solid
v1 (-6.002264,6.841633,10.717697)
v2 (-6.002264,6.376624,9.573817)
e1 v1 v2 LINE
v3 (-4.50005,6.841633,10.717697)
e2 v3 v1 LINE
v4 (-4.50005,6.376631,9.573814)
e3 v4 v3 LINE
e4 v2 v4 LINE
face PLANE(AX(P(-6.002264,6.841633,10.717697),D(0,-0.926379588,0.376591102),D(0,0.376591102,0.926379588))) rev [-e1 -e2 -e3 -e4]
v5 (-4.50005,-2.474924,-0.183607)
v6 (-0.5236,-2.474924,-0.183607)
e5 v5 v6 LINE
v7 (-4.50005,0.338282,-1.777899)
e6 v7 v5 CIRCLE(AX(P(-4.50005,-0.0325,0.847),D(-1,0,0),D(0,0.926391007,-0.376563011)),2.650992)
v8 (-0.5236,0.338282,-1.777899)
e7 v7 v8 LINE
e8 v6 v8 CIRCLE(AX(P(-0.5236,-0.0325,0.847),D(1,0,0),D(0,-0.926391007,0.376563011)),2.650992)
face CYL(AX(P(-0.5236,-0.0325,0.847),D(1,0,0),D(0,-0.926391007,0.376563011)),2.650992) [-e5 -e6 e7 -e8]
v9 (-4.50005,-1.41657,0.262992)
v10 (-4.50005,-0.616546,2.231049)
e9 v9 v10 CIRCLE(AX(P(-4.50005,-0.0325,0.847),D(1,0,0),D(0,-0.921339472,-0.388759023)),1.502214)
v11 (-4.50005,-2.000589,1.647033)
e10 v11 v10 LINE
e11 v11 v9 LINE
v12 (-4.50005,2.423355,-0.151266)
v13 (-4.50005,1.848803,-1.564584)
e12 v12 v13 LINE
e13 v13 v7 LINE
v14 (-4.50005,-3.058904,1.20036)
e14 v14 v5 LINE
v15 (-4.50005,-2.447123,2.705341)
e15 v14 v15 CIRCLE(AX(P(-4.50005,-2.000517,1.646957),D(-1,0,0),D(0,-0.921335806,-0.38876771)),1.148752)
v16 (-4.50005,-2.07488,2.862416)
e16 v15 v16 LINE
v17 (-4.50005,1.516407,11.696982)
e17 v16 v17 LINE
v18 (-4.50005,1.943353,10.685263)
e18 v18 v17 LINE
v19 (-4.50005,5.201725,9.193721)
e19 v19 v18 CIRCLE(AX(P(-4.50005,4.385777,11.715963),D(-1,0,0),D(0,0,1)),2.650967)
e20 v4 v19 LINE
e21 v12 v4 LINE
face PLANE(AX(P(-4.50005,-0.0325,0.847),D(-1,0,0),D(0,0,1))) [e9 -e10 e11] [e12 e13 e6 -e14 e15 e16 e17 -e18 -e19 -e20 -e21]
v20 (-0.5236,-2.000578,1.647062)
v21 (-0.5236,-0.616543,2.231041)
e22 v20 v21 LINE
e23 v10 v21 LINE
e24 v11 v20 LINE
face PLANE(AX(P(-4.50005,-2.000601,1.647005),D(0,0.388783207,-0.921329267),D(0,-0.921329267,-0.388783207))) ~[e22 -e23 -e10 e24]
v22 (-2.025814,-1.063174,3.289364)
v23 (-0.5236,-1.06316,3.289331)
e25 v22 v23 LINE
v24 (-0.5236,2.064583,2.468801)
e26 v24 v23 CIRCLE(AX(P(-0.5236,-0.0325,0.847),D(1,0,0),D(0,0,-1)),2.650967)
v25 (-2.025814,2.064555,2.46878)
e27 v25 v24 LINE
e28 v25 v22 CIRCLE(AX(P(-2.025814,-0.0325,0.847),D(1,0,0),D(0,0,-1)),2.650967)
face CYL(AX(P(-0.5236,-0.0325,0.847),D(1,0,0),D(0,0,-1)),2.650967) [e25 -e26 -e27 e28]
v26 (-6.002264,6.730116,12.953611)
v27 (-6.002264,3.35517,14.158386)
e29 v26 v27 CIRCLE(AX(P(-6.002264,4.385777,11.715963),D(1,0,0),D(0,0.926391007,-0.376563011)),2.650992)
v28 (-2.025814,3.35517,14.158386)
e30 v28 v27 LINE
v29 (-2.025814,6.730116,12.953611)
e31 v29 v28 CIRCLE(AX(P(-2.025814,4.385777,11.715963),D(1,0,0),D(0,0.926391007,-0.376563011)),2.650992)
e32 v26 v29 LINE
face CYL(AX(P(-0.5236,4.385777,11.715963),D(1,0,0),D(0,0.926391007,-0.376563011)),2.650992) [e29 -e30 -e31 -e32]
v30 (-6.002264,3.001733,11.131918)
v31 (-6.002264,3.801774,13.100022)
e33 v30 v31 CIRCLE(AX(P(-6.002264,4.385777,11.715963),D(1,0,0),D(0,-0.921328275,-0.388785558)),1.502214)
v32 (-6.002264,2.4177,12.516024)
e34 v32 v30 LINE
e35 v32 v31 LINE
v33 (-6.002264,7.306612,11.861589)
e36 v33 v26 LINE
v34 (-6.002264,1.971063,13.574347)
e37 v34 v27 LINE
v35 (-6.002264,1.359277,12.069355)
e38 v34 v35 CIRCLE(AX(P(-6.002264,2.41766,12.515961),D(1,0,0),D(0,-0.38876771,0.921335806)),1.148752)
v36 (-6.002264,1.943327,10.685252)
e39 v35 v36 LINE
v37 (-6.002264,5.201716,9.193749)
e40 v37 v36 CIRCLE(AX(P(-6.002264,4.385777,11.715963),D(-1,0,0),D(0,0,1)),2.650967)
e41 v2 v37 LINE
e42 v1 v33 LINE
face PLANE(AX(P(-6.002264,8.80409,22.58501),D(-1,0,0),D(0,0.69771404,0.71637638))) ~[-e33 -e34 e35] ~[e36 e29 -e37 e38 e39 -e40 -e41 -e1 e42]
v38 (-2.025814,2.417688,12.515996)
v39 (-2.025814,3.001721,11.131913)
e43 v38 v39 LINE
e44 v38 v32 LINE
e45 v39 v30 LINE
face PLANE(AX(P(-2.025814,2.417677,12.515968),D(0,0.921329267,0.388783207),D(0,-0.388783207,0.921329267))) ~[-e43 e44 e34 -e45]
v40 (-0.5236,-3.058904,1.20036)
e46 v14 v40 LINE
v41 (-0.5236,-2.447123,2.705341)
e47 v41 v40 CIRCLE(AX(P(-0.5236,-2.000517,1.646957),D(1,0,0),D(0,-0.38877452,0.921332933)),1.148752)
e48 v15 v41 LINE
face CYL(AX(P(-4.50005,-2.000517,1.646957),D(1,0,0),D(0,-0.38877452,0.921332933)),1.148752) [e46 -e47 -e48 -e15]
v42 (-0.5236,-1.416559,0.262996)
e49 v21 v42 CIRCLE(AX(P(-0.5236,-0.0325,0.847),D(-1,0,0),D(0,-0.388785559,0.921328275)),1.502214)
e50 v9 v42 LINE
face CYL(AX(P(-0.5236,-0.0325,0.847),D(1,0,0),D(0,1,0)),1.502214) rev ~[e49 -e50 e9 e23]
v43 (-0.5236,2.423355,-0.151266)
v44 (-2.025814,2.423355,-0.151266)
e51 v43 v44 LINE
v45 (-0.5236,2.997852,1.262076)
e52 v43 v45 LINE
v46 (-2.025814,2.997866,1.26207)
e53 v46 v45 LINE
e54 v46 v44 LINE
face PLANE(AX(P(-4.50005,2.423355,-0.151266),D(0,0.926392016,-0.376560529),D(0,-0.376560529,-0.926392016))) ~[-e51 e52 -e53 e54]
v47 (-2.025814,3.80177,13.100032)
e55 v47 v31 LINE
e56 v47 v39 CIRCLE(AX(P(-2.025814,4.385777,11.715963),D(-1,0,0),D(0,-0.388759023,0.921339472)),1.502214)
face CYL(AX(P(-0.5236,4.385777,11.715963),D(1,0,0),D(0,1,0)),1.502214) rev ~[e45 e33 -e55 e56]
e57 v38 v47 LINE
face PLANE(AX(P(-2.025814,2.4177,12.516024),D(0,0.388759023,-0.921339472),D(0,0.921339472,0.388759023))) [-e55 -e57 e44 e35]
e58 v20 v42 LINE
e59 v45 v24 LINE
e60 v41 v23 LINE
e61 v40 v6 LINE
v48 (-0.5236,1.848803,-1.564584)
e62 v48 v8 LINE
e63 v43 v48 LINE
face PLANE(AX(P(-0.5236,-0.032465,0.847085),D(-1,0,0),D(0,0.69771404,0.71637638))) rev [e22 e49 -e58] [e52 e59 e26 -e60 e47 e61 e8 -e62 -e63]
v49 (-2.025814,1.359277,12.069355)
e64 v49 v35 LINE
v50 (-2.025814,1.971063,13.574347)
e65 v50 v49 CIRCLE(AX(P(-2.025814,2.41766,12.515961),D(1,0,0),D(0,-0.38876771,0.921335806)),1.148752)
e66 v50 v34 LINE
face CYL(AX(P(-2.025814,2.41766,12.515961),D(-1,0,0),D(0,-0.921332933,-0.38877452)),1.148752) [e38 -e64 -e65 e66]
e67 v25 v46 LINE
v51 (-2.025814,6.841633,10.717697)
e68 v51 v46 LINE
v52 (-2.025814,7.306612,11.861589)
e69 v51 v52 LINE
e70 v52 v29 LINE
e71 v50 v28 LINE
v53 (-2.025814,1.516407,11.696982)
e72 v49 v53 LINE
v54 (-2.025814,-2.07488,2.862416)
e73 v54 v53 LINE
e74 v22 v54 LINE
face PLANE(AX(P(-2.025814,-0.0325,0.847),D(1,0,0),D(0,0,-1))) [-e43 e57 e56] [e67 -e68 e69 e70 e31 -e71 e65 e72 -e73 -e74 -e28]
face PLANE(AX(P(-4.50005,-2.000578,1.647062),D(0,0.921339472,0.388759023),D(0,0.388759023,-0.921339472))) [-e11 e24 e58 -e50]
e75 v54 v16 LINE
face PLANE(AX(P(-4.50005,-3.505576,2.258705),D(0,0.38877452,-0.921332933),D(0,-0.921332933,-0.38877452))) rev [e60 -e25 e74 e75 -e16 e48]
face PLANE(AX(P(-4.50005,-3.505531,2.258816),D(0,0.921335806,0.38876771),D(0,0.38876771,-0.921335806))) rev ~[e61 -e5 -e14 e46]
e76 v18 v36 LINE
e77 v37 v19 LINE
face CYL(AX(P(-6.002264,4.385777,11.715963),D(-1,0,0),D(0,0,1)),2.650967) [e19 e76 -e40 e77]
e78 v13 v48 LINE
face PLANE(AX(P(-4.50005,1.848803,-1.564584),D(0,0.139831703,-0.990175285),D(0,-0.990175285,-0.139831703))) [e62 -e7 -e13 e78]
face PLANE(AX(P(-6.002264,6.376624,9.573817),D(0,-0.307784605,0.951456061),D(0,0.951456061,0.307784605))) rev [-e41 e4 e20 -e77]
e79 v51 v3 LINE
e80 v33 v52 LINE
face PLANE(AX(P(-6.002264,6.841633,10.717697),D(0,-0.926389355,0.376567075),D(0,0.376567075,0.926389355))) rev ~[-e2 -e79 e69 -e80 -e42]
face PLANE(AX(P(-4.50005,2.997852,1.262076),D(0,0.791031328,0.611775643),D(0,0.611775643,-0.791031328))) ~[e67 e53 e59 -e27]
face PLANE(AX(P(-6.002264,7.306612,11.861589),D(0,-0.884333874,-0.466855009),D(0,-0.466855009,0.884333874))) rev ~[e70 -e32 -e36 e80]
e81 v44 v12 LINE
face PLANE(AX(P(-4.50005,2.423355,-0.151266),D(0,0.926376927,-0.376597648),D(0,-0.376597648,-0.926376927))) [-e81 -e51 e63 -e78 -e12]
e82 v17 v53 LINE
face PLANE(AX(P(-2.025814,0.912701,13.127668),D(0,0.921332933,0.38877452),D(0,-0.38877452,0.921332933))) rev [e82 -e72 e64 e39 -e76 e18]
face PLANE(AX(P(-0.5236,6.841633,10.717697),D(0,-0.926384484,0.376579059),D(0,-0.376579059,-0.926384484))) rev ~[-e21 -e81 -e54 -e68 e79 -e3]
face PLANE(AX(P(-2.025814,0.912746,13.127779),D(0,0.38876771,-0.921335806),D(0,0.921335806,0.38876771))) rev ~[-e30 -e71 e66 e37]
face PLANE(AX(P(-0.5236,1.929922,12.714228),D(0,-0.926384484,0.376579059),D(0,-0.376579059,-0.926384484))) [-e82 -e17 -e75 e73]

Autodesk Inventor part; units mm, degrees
ref_plane "YZ Plane" through (0, 0, 0) normal (1, 0, 0) x (0, 1, 0)
ref_plane "XY Plane" through (0, 0, 0) normal (0, 0, 1) x (1, 0, 0)
sketch "スケッチ1" plane through (0, 0, 0) normal (1, 0, 0) x (0, 1, 0)
  arc A0 (-2.7792, 1.1297) -> (2.7792, -1.1297) centre (0, 0) ccw
  circle A1 centre (5, 12.3) radius 1.7
  arc A2 (7.7792, 11.1703) -> (2.2208, 13.4297) centre (5, 12.3) ccw
  circle A3 centre (0, 0) radius 1.7
  line L0 (2.2208, 13.4297) -> (-2.7792, 1.1297)
  line L1 (7.7792, 11.1703) -> (2.7792, -1.1297)
  dimension "d1" = 3.4
  dimension "d2" = 6
  dimension "d3" = 3.4
  dimension "d4" = 5
  dimension "d5" = 12.3
  dimension "d8" = 3
extrude "押し出し1" add sketch "スケッチ1" against normal blind 6.2
sketch "スケッチ2" plane through (0, 0, 0) normal (1, 0, 0) x (0, 0, -1)
  circle A0 centre (0, 0) radius 1.7 projected
  circle A1 centre (-12.3, 5) radius 1.7 projected
  line L0 (-1.1297, -2.7792) -> (-13.4297, 2.2208) projected
  arc A2 (-1.1297, -2.7792) -> (1.1297, 2.7792) centre (0, 0) ccw projected
  line L1 (-11.1703, 7.7792) -> (1.1297, 2.7792) projected
  arc A3 (-11.1703, 7.7792) -> (-13.4297, 2.2208) centre (-12.3, 5) ccw projected
  circle A4 centre (0, 0) radius 3
  line L2 (-1.1297, -2.7792) -> (1.1297, 2.7792)
  dimension "d11" = 6
extrude "押し出し2" cut sketch "スケッチ2" against normal blind 1.7 contours A4 L0 A3 L1
sketch "スケッチ3" plane through (-6.2, 0, 0) normal (-1, 0, 0) x (0, 0, 1)
  circle A0 centre (0, 0) radius 1.7 projected
  circle A1 centre (12.3, 5) radius 1.7 projected
  line L0 (1.1297, -2.7792) -> (13.4297, 2.2208) projected
  arc A2 (13.4297, 2.2208) -> (11.1703, 7.7792) centre (12.3, 5) ccw projected
  line L1 (11.1703, 7.7792) -> (-1.1297, 2.7792) projected
  arc A3 (-1.1297, 2.7792) -> (1.1297, -2.7792) centre (0, 0) ccw projected
  circle A4 centre (12.3, 5) radius 3
  line L2 (11.1703, 7.7792) -> (13.4297, 2.2208)
  line L3 (1.1297, -2.7792) -> (13.4297, 2.2208) projected
  dimension "d14" = 6
extrude "押し出し3" cut sketch "スケッチ3" against normal blind 1.7 contours A4 L0 A3 L1
sketch "スケッチ4" plane through (-1.7, 0, 0) normal (1, 0, 0) x (0, 0, -1)
  arc A0 (1.1297, 2.7792) -> (-1.1297, -2.7792) centre (0, 0) ccw projected
  line L0 (-11.1703, 7.7792) -> (1.1297, 2.7792) projected
  arc A1 (-11.1703, 7.7792) -> (-13.4297, 2.2208) centre (-12.3, 5) ccw projected
  line L1 (-1.1297, -2.7792) -> (-13.4297, 2.2208) projected
  circle A2 centre (-12.3, 5) radius 1.7 projected
  line L2 (-13.4297, 2.2208) -> (-13.8977, 1.0697)
  line L3 (-13.8977, 1.0697) -> (-15.064, 3.8337)
  arc A3 (-11.1703, 7.7792) -> (-13.4297, 2.2208) centre (-12.3, 5) ccw projected
  dimension "d17" = 45
extrude "押し出し4" add sketch "スケッチ4" against normal up to surface (4.5 mm away) contours L2 L3 A1
mirror "ミラー1" about plane through (-1.7, 2.2208, 13.4297) normal (0, -0.3765791, -0.9263845) of "押し出し4"
sketch "スケッチ5" plane through (-1.7, 0, 0) normal (1, 0, 0) x (0, 0, -1)
  line L0 (-1.1297, -2.7792) -> (-12.2786, 1.7529) projected
  arc A0 (1.1297, 2.7792) -> (-1.1297, -2.7792) centre (0, 0) ccw projected
  line L1 (-11.1703, 7.7792) -> (1.1297, 2.7792) projected
  arc A1 (-11.1703, 7.7792) -> (-15.064, 3.8337) centre (-12.3, 5) ccw projected
  line L2 (-15.064, 3.8337) -> (-13.8977, 1.0697) projected
  line L3 (-12.2786, 1.7529) -> (-13.8977, 1.0697) projected
  circle A2 centre (-12.3, 5) radius 1.7 projected
  line L4 (-12.9402, 3.4251) -> (-13.2054, 2.7728)
  line L5 (-13.2054, 2.7728) -> (-13.8663, 4.3391)
  circle A3 centre (-12.3, 5) radius 1.7 projected
  arc A4 (-13.8663, 4.3391) -> (-12.9402, 3.4251) centre (-12.3, 5) ccw
  dimension "d20" = 45
extrude "押し出し5" cut sketch "スケッチ5" against normal blind 10 contours A2 L4 L5
mirror "ミラー2" about plane through (-1.7, 3.4251, 12.9402) normal (0, 0.3765791, 0.9263845) of "押し出し5"
fillet "フィレット1" radius 1.3 1 edges at (-3.95, 1.0697, 13.8977)
sketch "スケッチ6" plane through (-4.5, 0, 0) normal (-1, 0, 0) x (0, 0, 1)
  circle A0 centre (0, 0) radius 1.7 projected
  line L0 (12.2786, 1.7529) -> (11.1337, 2.236) projected
  arc A1 (11.1703, 7.7792) -> (11.1337, 2.236) centre (12.3, 5) ccw projected
  line L1 (-1.1297, 2.7792) -> (11.1703, 7.7792) projected
  arc A2 (-1.1297, 2.7792) -> (1.1297, -2.7792) centre (0, 0) ccw projected
  line L2 (12.2786, 1.7529) -> (1.1297, -2.7792) projected
  line L3 (1.1297, -2.7792) -> (1.5977, -3.9303)
  line L4 (1.5977, -3.9303) -> (-1.1663, -2.764)
  dimension "d24" = 45
extrude "押し出し6" add sketch "スケッチ6" against normal up to surface (4.5 mm away) contours L3 L4 A2
mirror "ミラー3" about plane through (-4.5, -2.7792, 1.1297) normal (0, 0.3765791, 0.9263845) of "押し出し6"
sketch "スケッチ7" plane through (-4.5, 0, 0) normal (-1, 0, 0) x (0, 0, 1)
  circle A0 centre (0, 0) radius 1.7 projected
  line L0 (0.6402, -1.5749) -> (0.9054, -2.2272)
  line L1 (0.9054, -2.2272) -> (-0.6609, -1.5663)
  line L2 (-1.1297, 2.7792) -> (11.1703, 7.7792) projected
  dimension "d29" = 45
extrude "押し出し7" cut sketch "スケッチ7" against normal blind 10 contours A0 L0 L1
mirror "ミラー4" about plane through (-4.5, -1.5749, 0.6402) normal (0, -0.3765791, -0.9263845) of "押し出し7"
fillet "フィレット2" radius 1.3 1 edges at (-2.25, -3.9303, 1.5977)
sketch "スケッチ8" plane through (-4.5, 0, 0) normal (-1, 0, 0) x (0, 0, 1)
  line L0 (-1.1297, 2.7792) -> (11.1703, 7.7792) projected
  arc A0 (-1.1297, 2.7792) -> (-1.1663, -2.764) centre (0, 0) ccw projected
  line L1 (-1.1297, 2.7792) -> (-2.7291, 2.129)
  line L2 (-2.7291, 2.129) -> (-2.9705, 0.4196)
extrude "押し出し8" add sketch "スケッチ8" against normal up to surface (4.5 mm away)
ref_plane "作業平面1" through (0, 2.7792, -1.1297) normal (0, -0.3765791, -0.9263845) x (-1, 0, 0)
mirror "ミラー5" about plane through (0, 2.7792, -1.1297) normal (0, -0.3765791, -0.9263845) of "押し出し8"
sketch "スケッチ9" plane through (-6.2, 0, 0) normal (-1, 0, 0) x (0, 0, 1)
  arc A0 (12.7, 1.5751) -> (14.4031, 2.2674) centre (13.2054, 2.7728) ccw projected
  line L0 (14.4031, 2.2674) -> (15.064, 3.8337) projected
  arc A1 (15.064, 3.8337) -> (11.1337, 2.236) centre (12.3, 5) ccw projected
  line L1 (12.7, 1.5751) -> (11.1337, 2.236) projected
  line L2 (13.2054, 2.7728) -> (11.6391, 3.4337) projected
  arc A2 (13.8663, 4.3391) -> (11.6391, 3.4337) centre (12.3, 5) ccw projected
  line L3 (13.8663, 4.3391) -> (13.2054, 2.7728) projected
  line L4 (-2.7291, 2.129) -> (11.1703, 7.7792) projected
  line L5 (11.1703, 7.7792) -> (12.4648, 8.3054)
  line L6 (12.4648, 8.3054) -> (13.7006, 7.653)
  point P0 (0, 0)
extrude "押し出し9" add sketch "スケッチ9" against normal up to surface (4.5 mm away) contours L5 L6 A1
ref_plane "作業平面2" through (0, 7.7792, 11.1703) normal (0, -0.3765791, -0.9263845) x (-1, 0, 0)
mirror "ミラー6" about plane through (0, 7.7792, 11.1703) normal (0, -0.3765791, -0.9263845) of "押し出し9"
ref_plane "作業平面3" through (0, 7.7792, 11.1703) normal (0, -0.3765791, -0.9263845) x (-1, 0, 0)
scale "尺度1" factors (0.8836555, 0.8836555, 0.8836555) then translate (-0.5236, -0.0325, 0.847) bodies 1
properties part number "HbRing-LittleCouplerLink01" material "ナイロン 6/6"
